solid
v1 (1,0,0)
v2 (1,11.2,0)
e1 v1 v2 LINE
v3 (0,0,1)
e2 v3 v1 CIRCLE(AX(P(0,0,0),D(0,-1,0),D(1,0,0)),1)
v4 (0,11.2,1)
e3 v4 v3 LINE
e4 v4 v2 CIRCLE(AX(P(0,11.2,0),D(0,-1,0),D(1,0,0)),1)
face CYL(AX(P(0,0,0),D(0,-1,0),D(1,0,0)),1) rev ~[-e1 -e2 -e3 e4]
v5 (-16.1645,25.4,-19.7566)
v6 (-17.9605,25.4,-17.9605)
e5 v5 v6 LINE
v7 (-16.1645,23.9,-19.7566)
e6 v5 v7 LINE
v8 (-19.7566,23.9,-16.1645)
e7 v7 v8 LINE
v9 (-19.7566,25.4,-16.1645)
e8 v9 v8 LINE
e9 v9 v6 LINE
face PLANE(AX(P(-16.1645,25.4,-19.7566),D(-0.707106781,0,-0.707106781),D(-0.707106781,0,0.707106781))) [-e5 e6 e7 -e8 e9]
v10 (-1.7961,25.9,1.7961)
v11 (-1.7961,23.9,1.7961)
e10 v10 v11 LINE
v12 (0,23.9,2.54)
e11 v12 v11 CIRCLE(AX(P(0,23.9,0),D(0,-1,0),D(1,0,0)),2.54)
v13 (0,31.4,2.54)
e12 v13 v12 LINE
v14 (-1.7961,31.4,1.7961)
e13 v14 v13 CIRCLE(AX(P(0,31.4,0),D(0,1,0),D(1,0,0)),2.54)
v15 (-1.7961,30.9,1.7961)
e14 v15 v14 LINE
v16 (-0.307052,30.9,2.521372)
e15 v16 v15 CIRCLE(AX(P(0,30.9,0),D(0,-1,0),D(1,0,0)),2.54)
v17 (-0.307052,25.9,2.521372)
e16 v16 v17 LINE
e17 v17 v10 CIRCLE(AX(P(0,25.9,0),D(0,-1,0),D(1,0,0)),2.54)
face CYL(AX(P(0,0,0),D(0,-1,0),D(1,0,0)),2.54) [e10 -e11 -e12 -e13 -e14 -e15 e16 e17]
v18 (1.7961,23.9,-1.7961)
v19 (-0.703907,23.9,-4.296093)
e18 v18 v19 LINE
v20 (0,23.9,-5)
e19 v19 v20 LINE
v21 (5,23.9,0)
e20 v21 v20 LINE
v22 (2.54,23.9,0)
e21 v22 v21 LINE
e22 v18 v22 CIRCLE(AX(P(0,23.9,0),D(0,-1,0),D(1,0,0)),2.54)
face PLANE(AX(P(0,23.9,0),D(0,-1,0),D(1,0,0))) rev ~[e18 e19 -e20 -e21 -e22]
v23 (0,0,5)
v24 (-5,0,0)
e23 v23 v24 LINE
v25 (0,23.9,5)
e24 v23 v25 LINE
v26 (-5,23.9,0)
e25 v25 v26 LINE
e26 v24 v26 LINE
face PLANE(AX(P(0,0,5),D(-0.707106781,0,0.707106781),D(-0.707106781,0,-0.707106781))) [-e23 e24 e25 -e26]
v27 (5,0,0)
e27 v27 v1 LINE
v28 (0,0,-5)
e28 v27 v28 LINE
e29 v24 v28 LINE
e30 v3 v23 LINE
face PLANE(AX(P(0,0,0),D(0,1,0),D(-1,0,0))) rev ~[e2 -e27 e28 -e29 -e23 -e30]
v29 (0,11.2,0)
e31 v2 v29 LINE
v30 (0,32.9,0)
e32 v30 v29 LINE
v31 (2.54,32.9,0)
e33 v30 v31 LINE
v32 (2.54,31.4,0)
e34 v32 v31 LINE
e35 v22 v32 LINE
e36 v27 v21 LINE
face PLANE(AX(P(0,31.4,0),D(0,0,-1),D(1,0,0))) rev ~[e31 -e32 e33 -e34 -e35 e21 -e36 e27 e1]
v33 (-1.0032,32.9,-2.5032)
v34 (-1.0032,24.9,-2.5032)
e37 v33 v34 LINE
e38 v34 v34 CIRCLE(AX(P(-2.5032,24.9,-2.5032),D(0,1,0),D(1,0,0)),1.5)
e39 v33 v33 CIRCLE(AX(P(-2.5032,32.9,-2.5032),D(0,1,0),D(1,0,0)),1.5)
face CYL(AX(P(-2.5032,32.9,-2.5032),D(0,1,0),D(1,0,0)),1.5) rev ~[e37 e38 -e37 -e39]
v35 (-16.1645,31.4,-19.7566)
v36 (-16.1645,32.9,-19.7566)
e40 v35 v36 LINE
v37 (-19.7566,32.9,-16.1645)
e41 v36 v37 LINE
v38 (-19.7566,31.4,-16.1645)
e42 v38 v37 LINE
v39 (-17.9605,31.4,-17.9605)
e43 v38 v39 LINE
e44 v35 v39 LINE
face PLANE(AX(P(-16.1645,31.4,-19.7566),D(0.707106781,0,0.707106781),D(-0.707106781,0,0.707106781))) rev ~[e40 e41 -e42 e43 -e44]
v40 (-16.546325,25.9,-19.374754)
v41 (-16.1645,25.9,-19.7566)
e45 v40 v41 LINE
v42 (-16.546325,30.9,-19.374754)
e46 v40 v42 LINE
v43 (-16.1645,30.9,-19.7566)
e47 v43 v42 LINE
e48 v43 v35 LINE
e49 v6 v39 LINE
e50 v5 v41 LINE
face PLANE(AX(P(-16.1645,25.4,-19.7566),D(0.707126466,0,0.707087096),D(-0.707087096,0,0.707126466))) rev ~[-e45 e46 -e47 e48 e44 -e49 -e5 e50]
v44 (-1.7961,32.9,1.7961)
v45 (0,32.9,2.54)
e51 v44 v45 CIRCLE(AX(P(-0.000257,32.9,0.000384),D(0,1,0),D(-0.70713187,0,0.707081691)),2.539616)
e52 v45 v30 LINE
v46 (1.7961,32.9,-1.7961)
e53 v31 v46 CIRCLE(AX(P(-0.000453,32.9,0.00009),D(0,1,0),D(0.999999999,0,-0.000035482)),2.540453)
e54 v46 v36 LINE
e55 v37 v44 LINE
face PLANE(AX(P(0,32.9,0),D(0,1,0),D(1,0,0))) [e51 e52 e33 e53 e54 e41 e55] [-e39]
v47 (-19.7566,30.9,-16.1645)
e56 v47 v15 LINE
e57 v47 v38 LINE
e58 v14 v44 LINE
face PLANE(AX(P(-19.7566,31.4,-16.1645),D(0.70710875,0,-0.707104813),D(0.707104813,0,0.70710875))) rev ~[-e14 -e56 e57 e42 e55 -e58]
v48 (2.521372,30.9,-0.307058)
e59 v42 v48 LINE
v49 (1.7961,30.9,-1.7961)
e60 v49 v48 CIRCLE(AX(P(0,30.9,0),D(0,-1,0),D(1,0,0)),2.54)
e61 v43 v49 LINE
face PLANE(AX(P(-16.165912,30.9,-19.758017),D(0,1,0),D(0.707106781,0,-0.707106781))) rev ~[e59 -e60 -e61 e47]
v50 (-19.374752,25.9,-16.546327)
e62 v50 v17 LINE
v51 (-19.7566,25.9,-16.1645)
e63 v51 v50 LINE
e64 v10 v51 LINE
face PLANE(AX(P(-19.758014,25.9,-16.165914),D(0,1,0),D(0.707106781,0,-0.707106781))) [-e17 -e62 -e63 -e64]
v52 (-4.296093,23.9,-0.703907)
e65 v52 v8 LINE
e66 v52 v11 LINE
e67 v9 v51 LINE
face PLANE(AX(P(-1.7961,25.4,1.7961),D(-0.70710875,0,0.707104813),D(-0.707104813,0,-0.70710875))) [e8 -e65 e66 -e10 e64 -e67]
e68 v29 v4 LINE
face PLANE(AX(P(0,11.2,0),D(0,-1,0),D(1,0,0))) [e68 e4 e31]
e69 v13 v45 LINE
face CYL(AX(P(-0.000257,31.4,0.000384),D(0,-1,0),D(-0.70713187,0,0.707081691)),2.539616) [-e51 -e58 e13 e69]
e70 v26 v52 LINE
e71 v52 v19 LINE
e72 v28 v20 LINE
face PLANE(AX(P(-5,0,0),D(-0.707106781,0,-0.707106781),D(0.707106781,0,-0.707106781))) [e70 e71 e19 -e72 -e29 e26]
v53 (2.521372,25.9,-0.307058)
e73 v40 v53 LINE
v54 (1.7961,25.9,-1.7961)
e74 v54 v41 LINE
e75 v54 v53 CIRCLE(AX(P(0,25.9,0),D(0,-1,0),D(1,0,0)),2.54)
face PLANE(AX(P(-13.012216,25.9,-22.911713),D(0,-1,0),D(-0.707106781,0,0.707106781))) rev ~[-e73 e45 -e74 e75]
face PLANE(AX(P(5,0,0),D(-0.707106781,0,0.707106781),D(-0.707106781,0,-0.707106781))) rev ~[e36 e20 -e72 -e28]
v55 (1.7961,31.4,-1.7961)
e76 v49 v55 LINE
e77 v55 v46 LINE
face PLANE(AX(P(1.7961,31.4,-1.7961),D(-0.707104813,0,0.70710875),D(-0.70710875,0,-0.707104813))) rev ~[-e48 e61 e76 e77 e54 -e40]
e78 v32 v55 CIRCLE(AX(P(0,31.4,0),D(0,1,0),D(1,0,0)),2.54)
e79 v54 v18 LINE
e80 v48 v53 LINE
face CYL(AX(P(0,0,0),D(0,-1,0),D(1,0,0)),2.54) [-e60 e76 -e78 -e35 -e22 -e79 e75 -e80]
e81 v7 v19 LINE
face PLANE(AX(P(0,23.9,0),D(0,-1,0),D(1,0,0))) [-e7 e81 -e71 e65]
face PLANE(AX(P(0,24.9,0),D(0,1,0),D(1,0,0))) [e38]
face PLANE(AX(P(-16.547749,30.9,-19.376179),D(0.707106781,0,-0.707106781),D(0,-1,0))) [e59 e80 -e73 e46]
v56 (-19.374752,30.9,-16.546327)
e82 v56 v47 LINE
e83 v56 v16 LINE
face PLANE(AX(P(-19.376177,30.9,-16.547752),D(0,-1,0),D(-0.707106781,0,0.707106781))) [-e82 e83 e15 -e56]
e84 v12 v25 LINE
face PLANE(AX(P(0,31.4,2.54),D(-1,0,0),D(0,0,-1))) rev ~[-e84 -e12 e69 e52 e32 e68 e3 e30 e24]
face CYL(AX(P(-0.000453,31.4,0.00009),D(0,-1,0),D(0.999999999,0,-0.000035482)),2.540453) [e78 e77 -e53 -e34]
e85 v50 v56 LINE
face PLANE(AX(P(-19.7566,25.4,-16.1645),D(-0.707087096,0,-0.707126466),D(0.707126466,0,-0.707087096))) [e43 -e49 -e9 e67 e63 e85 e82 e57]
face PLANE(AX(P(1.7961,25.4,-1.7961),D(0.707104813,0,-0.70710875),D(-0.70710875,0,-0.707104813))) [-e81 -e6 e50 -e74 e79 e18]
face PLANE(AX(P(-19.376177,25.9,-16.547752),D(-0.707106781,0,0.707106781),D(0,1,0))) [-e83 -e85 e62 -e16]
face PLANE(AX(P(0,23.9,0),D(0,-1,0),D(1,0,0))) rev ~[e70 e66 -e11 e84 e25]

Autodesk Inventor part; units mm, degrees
ref_plane "YZ Plane" through (0, 0, 0) normal (1, 0, 0) x (0, 1, 0)
ref_plane "XZ Plane" through (0, 0, 0) normal (0, 1, 0) x (-1, 0, 0)
ref_plane "XY Plane" through (0, 0, 0) normal (0, 0, 1) x (1, 0, 0)
sketch "Sketch1" plane through (0, 0, 0) normal (0, 1, 0) x (-1, 0, 0)
  arc A0 (-2.54, 0) -> (0, 2.54) centre (0, 0) ccw
  line L0 (0, 2.54) -> (0, 0)
  line L1 (0, 0) -> (-2.54, 0)
  dimension "d0" = 5.08
extrude "Extrusion1" add sketch "Sketch1" along normal blind 25.4
sketch "Sketch2" plane through (0, 25.4, 0) normal (0, 1, 0) x (1, 0, 0)
  line L0 (0, -2.54) -> (0, 0) projected
  line L1 (0, 0) -> (-17.9605, 17.9605)
  line L2 (0, 0) -> (25.4, 0) construction
  line L3 (0, 0) -> (-1.7961, -1.7961)
  arc A0 (2.54, 0) -> (0, -2.54) centre (0, 0) ccw projected
  line L4 (0, 0) -> (1.7961, 1.7961)
  line L5 (-1.7961, -1.7961) -> (-19.7566, 16.1645)
  line L6 (-19.7566, 16.1645) -> (-17.9605, 17.9605)
  line L7 (-16.1645, 19.7566) -> (1.7961, 1.7961)
  line L8 (-16.1645, 19.7566) -> (-17.9605, 17.9605)
  line L9 (0, 0) -> (2.54, 0)
  dimension "d3" = 25.4
  dimension "d4" = 135
extrude "Extrusion2" add sketch "Sketch2" along normal blind 6
sketch "Sketch3" plane through (-19.7566, 25.4, -16.1645) normal (-0.7071068, 0, -0.7071068) x (-0.7071068, 0, 0.7071068)
  line L0 (-5.08, 0) -> (-5.08, 6) projected
  line L1 (0, 6) -> (-5.08, 6)
  line L2 (-5.08, 6) -> (-5.08, 0)
  line L3 (-5.08, 0) -> (0, 0)
  line L4 (0, 0.5) -> (0, 5.5)
  line L5 (-2.54, 6) -> (-4.3361, 6) projected
  line L6 (-2.54, 6) -> (-2.54, 0)
  line L7 (-4.54, 0) -> (-0.54, 0)
  line L8 (-0.54, 0.5) -> (-0.54, 5.5)
  line L9 (-0.54, 6) -> (-4.54, 6)
  line L10 (-4.54, 6) -> (-4.54, 0)
  line L11 (-4.54, 0) -> (-0.54, 6) construction
  line L12 (-0.54, 0) -> (-4.54, 6) construction
  line L13 (0, 0.5) -> (-5.08, 0.5)
  line L14 (-5.08, 0.5) -> (-5.08, 5.5)
  line L15 (-5.08, 5.5) -> (0, 5.5)
  line L16 (0, 0.5) -> (-5.08, 5.5) construction
  line L17 (-5.08, 0.5) -> (0, 5.5) construction
  line L18 (-5.08, 0) -> (0, 0)
  line L19 (0, 0) -> (0, 6)
  line L20 (0, 6) -> (-5.08, 6)
  line L21 (-5.08, 6) -> (-5.08, 0)
  line L22 (-5.08, 0) -> (0, 6) construction
  line L23 (0, 0) -> (-5.08, 6) construction
  line L24 (-0.7439, 6) -> (0, 6)
  line L25 (-5.08, 0) -> (0, 0)
  line L26 (0, 0) -> (0, 6)
  line L27 (0, 6) -> (-5.08, 6)
  line L28 (-5.08, 6) -> (-5.08, 0)
  line L29 (-5.08, 0) -> (0, 6) construction
  line L30 (0, 0) -> (-5.08, 6) construction
  line L31 (0, 6) -> (0, 0)
  line L32 (-4.54, 5.5) -> (-9.54, 5.5)
  line L33 (-9.54, 5.5) -> (-9.54, 0.5)
  line L34 (-9.54, 0.5) -> (-4.54, 0.5)
  line L35 (-4.54, 0.5) -> (-4.54, 5.5)
  line L36 (-0.54, 5.5) -> (4.46, 5.5)
  line L37 (4.46, 5.5) -> (4.46, 0.5)
  line L38 (4.46, 0.5) -> (-0.54, 0.5)
  line L39 (-0.54, 0.5) -> (-0.54, 5.5)
  point P0 (-2.54, -25.4)
  point P1 (-2.54, 3)
  point P2 (-4.54, 5.5)
  point P3 (-5.08, 5.5)
  point P4 (-5.08, 0.5)
  point P5 (-4.54, 0.5)
  point P6 (0, 5.5)
  point P7 (0, 0.5)
  point P8 (-5.08, 0.5)
  point P9 (-5.08, 5.5)
  dimension "d7" = 4
  dimension "d8" = 5
  dimension "d11" = 6
  dimension "d40" = 5
  dimension "d41" = 5
extrude "Extrusion5" cut sketch "Sketch3" against normal blind 33.8125 contours L34 L33 L32 L0 | L0 L15 L10 L13 | L8 L15 L4 L13 | L4 L36 L37 L38
sketch "Sketch6" plane through (0, 31.4, 0) normal (0, 1, 0) x (1, 0, 0)
  arc A0 (1.7961, 1.7961) -> (-1.7961, -1.7961) centre (0, 0) ccw projected
  circle A1 centre (0, 0) radius 2.54
  line L0 (1.7961, 1.7961) -> (-16.1645, 19.7566) projected
  line L1 (0, 3.5921) -> (-3.5921, 0)
  line L2 (-19.7566, 16.1645) -> (-1.7961, -1.7961) projected
  line L3 (-1.7961, 1.7961) -> (-2.5032, 2.5032)
  circle A2 centre (-2.5032, 2.5032) radius 2.54
  dimension "d16" = 1
ref_plane "Work Plane3" through (-2.5032, 37.9, -2.5032) normal (0, 1, 0) x (1, 0, 0)
sketch "Sketch7" plane through (-2.5032, 37.9, -2.5032) normal (0, 1, 0) x (1, 0, 0)
  circle A0 centre (0, 0) radius 1.5
  point P0 (2.5032, -2.5032)
  dimension "d19" = 3
extrude "Extrusion7" cut sketch "Sketch7" against normal blind 6
sketch "Sketch10" plane through (0, 31.4, 0) normal (0, 1, 0) x (1, 0, 0)
  arc A0 (-1.7961, -1.7961) -> (0, -2.54) centre (0, 0) ccw projected
  line L0 (0, -2.54) -> (0, 0) projected
  line L1 (0, 0) -> (2.54, 0) projected
  line L2 (1.7961, 1.7961) -> (-16.1645, 19.7566) projected
  line L3 (-19.7566, 16.1645) -> (-1.7961, -1.7961) projected
  line L4 (-19.7566, 16.1645) -> (-1.7961, -1.7961) projected
  line L5 (-16.1645, 19.7566) -> (-19.7566, 16.1645) projected
  line L6 (1.7961, 1.7961) -> (-16.1645, 19.7566) projected
  arc A1 (2.54, 0) -> (1.7961, 1.7961) centre (0, 0) ccw projected
  point P0 (-0.7071, 4.2992)
  point P1 (2.5214, 0.3071)
  point P2 (-4.2992, 0.7071)
extrude "Extrusion9" add sketch "Sketch10" along normal blind 1.5
sketch "Sketch11" plane through (0, 25.4, 0) normal (0, -1, 0) x (1, 0, 0)
  arc A0 (-1.7961, 1.7961) -> (1.7961, -1.7961) centre (0, 0) ccw projected
  line L0 (-19.7566, -16.1645) -> (-1.7961, 1.7961) projected
  line L1 (-16.1645, -19.7566) -> (-19.7566, -16.1645) projected
  line L2 (1.7961, -1.7961) -> (-16.1645, -19.7566) projected
extrude "Extrusion10" add sketch "Sketch11" along normal blind 1.5
sketch "Sketch13" plane through (0, 0, 0) normal (0, -1, 0) x (1, 0, 0)
  line L0 (0, 0) -> (2.54, 0) projected
  arc A0 (0, 5) -> (5, 0) centre (0, 0) ccw
  line L1 (0, 0) -> (0, 5)
  line L2 (0, 0) -> (5, 0)
  dimension "d37" = 10
extrude "Extrusion12" add sketch "Sketch13" against normal up to surface (23.9 mm away)
sketch "Sketch14" plane through (0, 0, 0) normal (0, -1, 0) x (1, 0, 0)
  circle A0 centre (0, 0) radius 1
  dimension "d42" = 2
extrude "Extrusion13" cut sketch "Sketch14" against normal blind 11.2
sketch "Sketch15" plane through (0, 32.9, 0) normal (0, 1, 0) x (1, 0, 0)
  circle A0 centre (-2.5032, 2.5032) radius 1.5 projected
  circle A1 centre (-2.5032, 2.5032) radius 1.5
  point P0 (0, 0)
extrude "Extrusion14" cut sketch "Sketch15" against normal blind 8
thread "Thread2" size "M3x0.5" class "6H" standard "ANSI Metric M Profile" full length
sketch "Sketch16" plane through (0, 0, 0) normal (0, -1, 0) x (1, 0, 0)
  arc A0 (0, 5) -> (5, 0) centre (0, 0) ccw projected
  line L0 (0, 0) -> (3.981, 3.981)
  line L1 (0, 0) -> (5.63, 0) construction
  line L2 (0, 5) -> (-5, 0)
  line L3 (5, 0) -> (0, -5)
  line L4 (-5, 0) -> (0, -5)
  circle A1 centre (0, 0) radius 5
  dimension "d52" = 45
extrude "Extrusion15" cut sketch "Sketch16" against normal up to surface (23.9 mm away) contours L2 A0 | L4 A0 | L3 A0
sketch "Sketch17" plane through (-19.3747, 25.9, -16.5463) normal (-0.7071068, 0, -0.7071068) x (-0.7071068, 0, 0.7071068)
  line L0 (0, 0) -> (0.54, 0) projected
  line L1 (0.54, 5) -> (0, 5) projected
  line L2 (-4, 0) -> (-4, 5) projected
  line L3 (-4.54, 0) -> (-4, 0) projected
  line L4 (-4, 5) -> (-4.54, 5) projected
  line L5 (0.54, -2) -> (0.54, 0) projected
  line L6 (0.54, -2) -> (-0.2039, -2) projected
  line L7 (-2, 7) -> (-3.7961, 7) projected
  line L8 (-4.54, 5) -> (-4.54, 7) projected
  line L9 (-3.7961, 7) -> (-4.54, 7) projected
  line L10 (0.54, -2) -> (-0.2039, -2) projected
  line L11 (-0.2039, -2) -> (-0.2039, 7) projected
  line L12 (0.54, 7) -> (-0.2039, 7) projected
  line L13 (0.54, 5) -> (0.54, 7) projected
  line L14 (0.54, 5) -> (0, 5) projected
  line L15 (0, 5) -> (0, 0) projected
  line L16 (0, 0) -> (0.54, 0) projected
  line L17 (0.54, -2) -> (0.54, 0) projected
  line L18 (-3.7961, -2) -> (-3.7961, 7) projected
  line L19 (-3.7961, -2) -> (-4.54, -2) projected
  line L20 (-4.54, -2) -> (-4.54, 0) projected
  line L21 (-4.54, 0) -> (-4, 0) projected
  line L22 (-4, 0) -> (-4, 5) projected
  line L23 (-4, 5) -> (-4.54, 5) projected
  line L24 (-4.54, 5) -> (-4.54, 7) projected
  line L25 (-3.7961, 7) -> (-4.54, 7) projected
  line L26 (-3.7961, -2) -> (-3.7961, 7) projected
  line L27 (0.54, -2) -> (-4.54, -2) projected
  line L28 (0, 5) -> (0, 0) projected
  line L29 (-3.7961, -2) -> (-4.54, -2) projected
  line L30 (0.54, -2) -> (-4.54, -2) projected
  line L31 (0.54, 0) -> (0, 0) projected
  line L32 (0, 0) -> (0, 5) projected
  line L33 (0, 5) -> (0.54, 5) projected
  line L34 (0.54, 5) -> (0.54, 7) projected
  line L35 (-4.54, 7) -> (0.54, 7) projected
  line L36 (-4.54, 5) -> (-4.54, 7) projected
  line L37 (-4.54, 5) -> (-4, 5) projected
  line L38 (-4, 5) -> (-4, 0) projected
  line L39 (-4, 0) -> (-4.54, 0) projected
  line L40 (-4.54, -2) -> (-4.54, 0) projected
  line L41 (0.54, -2) -> (-4.54, -2) projected
  line L42 (0.54, 0) -> (0.54, -2) projected
  line L43 (-3.5, 7) -> (-0.5, 7) projected
  line L44 (-0.2039, 7) -> (-2, 7) projected
  line L45 (-2, 7) -> (-3.7961, 7) projected
  line L46 (-3.7961, 7) -> (-4.54, 7) projected
  line L47 (-4.54, 7) -> (0.54, 7) projected
  line L48 (0.54, 7) -> (-0.2039, 7) projected
  line L49 (0.54, -2) -> (-4.54, -2) projected
  line L50 (0.54, -2) -> (-4.54, -2) projected
  line L51 (0.54, 5) -> (0.54, 7) projected
  line L52 (0, 5) -> (0.54, 5) projected
  line L53 (0.54, 5) -> (0.54, 7) projected
  line L54 (0.54, 0) -> (0, 0) projected
  line L55 (0.54, 5) -> (0.54, 7) projected
  line L56 (0.54, 5) -> (0.54, 7) projected
  line L57 (0.54, 0) -> (0.54, -2) projected
  line L58 (0.54, -2) -> (0.54, 0) projected
  line L59 (0.54, 5) -> (0, 5) projected
  line L60 (0, 5) -> (0.54, 5) projected
  line L61 (0, 0) -> (0.54, 0) projected
  line L62 (0.54, 0) -> (0, 0) projected
  line L63 (0, 5) -> (0, 0) projected
  line L64 (0, 0) -> (0, 5) projected
  line L65 (-4.54, -2) -> (-4.54, 0) projected
  line L66 (0.54, 7) -> (-0.2039, 7) projected
  line L67 (-4.54, 5) -> (-4.54, 7) projected
  line L68 (-4.54, -2) -> (-4.54, 0) projected
  line L69 (-4, 0) -> (-4.54, 0) projected
  line L70 (-4.54, 5) -> (-4, 5) projected
  line L71 (-4, 0) -> (-4, 5) projected
  line L72 (-4, 5) -> (-4, 0) projected
  line L73 (-4, 0) -> (-4.54, 0) projected
  line L74 (-4.54, 0) -> (-4, 0) projected
  line L75 (-4, 5) -> (-4.54, 5) projected
  line L76 (-4.54, 5) -> (-4, 5) projected
  line L77 (-4.54, -2) -> (-4.54, 0) projected
  line L78 (-4.54, -2) -> (-4.54, 0) projected
  line L79 (-4.54, 5) -> (-4.54, 7) projected
  line L80 (-4.54, 5) -> (-4.54, 7) projected
  line L81 (-4.54, 7) -> (0.54, 7) projected
  line L82 (-4, 5) -> (-4, 0) projected
  line L83 (0.54, 0) -> (0.54, -2) projected
  line L84 (-0.2039, -2) -> (-0.2039, 7) projected
  line L85 (-3.5, -1) -> (-0.5, -1) projected
  line L86 (-3.5, -1) -> (-0.5, -1) projected
  line L87 (-3.5, 7) -> (-0.5, 7) projected
  line L88 (-3.5, -1) -> (-0.5, -1) projected
  line L89 (-3.5, 7) -> (-0.5, 7) projected
  line L90 (0, 0) -> (0, 5) projected
  line L91 (-0.2039, 7) -> (-2, 7) projected
  line L92 (0.54, 5.5) -> (-4.54, 5.5) projected
  line L93 (0.54, 5.5) -> (-4.54, 5.5) projected
  line L94 (-4.54, 5.5) -> (0.54, 5.5) projected
  line L95 (0.54, 5.5) -> (-4.54, 5.5) projected
  point P0 (-2, -25.9)
  point P1 (-2, 5.5)
  point P2 (-2, 5.5)
  point P3 (-2, 5.5)
  point P4 (-4.54, 5.5)
  point P5 (0.54, 5.5)
  point P6 (0.54, 5.5)
  point P7 (-2, 5.5)
  point P8 (-2, 5.5)
  point P9 (-2, 5.5)
  point P10 (-2, 5.5)
sketch "Sketch18" plane through (0, 32.9, 0) normal (0, 1, 0) x (1, 0, 0)
  point P0 (0, 0)
sketch "Sketch19" plane through (0, 0, 0) normal (0, -1, 0) x (1, 0, 0)
  arc A0 (-0.3071, 2.5214) -> (-1.7961, 1.7961) centre (0, 0) ccw projected
  arc A1 (-0.3071, 2.5214) -> (-1.7961, 1.7961) centre (0, 0) ccw projected
  arc A2 (1.7961, -1.7961) -> (2.5214, -0.3071) centre (0, 0) ccw projected
  arc A3 (1.7961, -1.7961) -> (2.5214, -0.3071) centre (0, 0) ccw projected
  arc A4 (0, 2.54) -> (-1.7961, 1.7961) centre (0, 0) ccw projected
  line L0 (0, 5) -> (0, 2.54) projected
  line L1 (0, 0) -> (2.54, 0) projected
  line L2 (-1.7961, 1.7961) -> (-4.2961, -0.7039) projected
  arc A5 (1.7961, -1.7961) -> (2.54, 0) centre (0, 0) ccw projected
  line L3 (-4.2961, -0.7039) -> (-5, 0) projected
  arc A6 (0, 2.54) -> (-1.7961, 1.7961) centre (0, 0) ccw projected
  arc A7 (0, 2.54) -> (-1.7961, 1.7961) centre (0, 0) ccw projected
  arc A8 (-0.3071, 2.5214) -> (-1.7961, 1.7961) centre (0, 0) ccw projected
  arc A9 (-0.3071, 2.5214) -> (-1.7961, 1.7961) centre (0, 0) ccw projected
  line L4 (-5, 0) -> (0, 5) projected
  line L5 (-5, 0) -> (0, 5) projected
  line L6 (0, 5) -> (0, 2.54) projected
  arc A10 (0, 2.54) -> (-1.7961, 1.7961) centre (0, 0) ccw projected
  line L7 (-1.7961, 1.7961) -> (-4.2961, -0.7039) projected
  line L8 (-4.2961, -0.7039) -> (-5, 0) projected
  arc A11 (1.7961, -1.7961) -> (2.54, 0) centre (0, 0) ccw projected
  arc A12 (1.7961, -1.7961) -> (2.5214, -0.3071) centre (0, 0) ccw projected
  arc A13 (1.7961, -1.7961) -> (2.5214, -0.3071) centre (0, 0) ccw projected
  arc A14 (1.7961, -1.7961) -> (2.54, 0) centre (0, 0) ccw projected
  line L9 (-4.2961, -0.7039) -> (-0.7039, -4.2961) projected
  line L10 (0, 1) -> (0, 0) projected
  line L11 (0, 1) -> (0, 0) projected
  line L12 (0, 2.54) -> (0, 0) projected
  line L13 (0, 5) -> (0, 2.54) projected
  line L14 (0, 5) -> (0, 1) projected
  line L15 (0, 0) -> (1, 0) projected
  line L16 (1, 0) -> (5, 0) projected
  line L17 (2.54, 0) -> (5, 0) projected
  line L18 (0, 0) -> (2.54, 0) projected
  line L19 (5, 0) -> (0, -5) projected
  line L20 (0, -5) -> (5, 0) projected
  line L21 (-4.2961, -0.7039) -> (-5, 0) projected
  line L22 (-4.2961, -0.7039) -> (-0.7039, -4.2961) projected
  line L23 (0, -5) -> (-0.7039, -4.2961) projected
  line L24 (-5, 0) -> (0, -5) projected
  line L25 (-5, 0) -> (0, -5) projected
  line L26 (0, 5) -> (-5, 0) projected
  line L27 (-5, 0) -> (0, 5) projected
  line L28 (0, 5) -> (-5, 0) projected
  line L29 (0, -5) -> (-0.7039, -4.2961) projected
  arc A15 (1.7961, -1.7961) -> (2.54, 0) centre (0, 0) ccw projected
  line L30 (-0.7039, -4.2961) -> (1.7961, -1.7961) projected
  line L31 (2.54, 0) -> (5, 0) projected
  line L32 (5, 0) -> (0, -5) projected
  line L33 (0, -5) -> (-0.7039, -4.2961) projected
  line L34 (-0.7039, -4.2961) -> (1.7961, -1.7961) projected
  arc A16 (1.7961, -1.7961) -> (2.54, 0) centre (0, 0) ccw projected
  line L35 (2.54, 0) -> (5, 0) projected
  line L36 (5, 0) -> (0, -5) projected
  arc A17 (0, 2.54) -> (-1.7961, 1.7961) centre (0, 0) ccw projected
  circle A18 centre (-2.5032, -2.5032) radius 1.5 projected
  circle A19 centre (-2.5032, -2.5032) radius 1.5 projected
  circle A20 centre (-2.5032, -2.5032) radius 1.5 projected
  circle A21 centre (-2.5032, -2.5032) radius 1.5 projected
  circle A22 centre (-2.5032, -2.5032) radius 1.5 projected
  line L37 (0, 5) -> (0, 1) projected
  arc A23 (0, 1) -> (1, 0) centre (0, 0) ccw projected
  line L38 (0, -5) -> (5, 0) projected
  line L39 (1, 0) -> (5, 0) projected
  line L40 (0, 0) -> (1, 0) projected
  arc A24 (0, 1) -> (1, 0) centre (0, 0) ccw projected
  line L41 (0, 0) -> (1, 0) projected
  line L42 (0, 1) -> (0, 0) projected
  arc A25 (0, 1) -> (1, 0) centre (0, 0) ccw projected
  arc A26 (0, 1) -> (1, 0) centre (0, 0) ccw projected
  arc A27 (0, 1) -> (1, 0) centre (0, 0) ccw projected
  line L43 (0, 5) -> (-5, 0) projected
  line L44 (-5, 0) -> (0, -5) projected
  line L45 (0, -5) -> (5, 0) projected
  line L46 (1, 0) -> (5, 0) projected
  arc A28 (0, 1) -> (1, 0) centre (0, 0) ccw projected
  line L47 (0, 5) -> (0, 1) projected
  line L48 (0, 2.54) -> (0, 0) projected
  arc A29 (-1.7961, 1.7961) -> (1.7961, -1.7961) centre (0, 0) ccw projected
  circle A30 centre (0, 0) radius 2.54 projected
  line L49 (0, -3.5921) -> (-3.5921, 0) projected
  line L50 (-1.7961, -1.7961) -> (-2.5032, -2.5032) projected
  circle A31 centre (-2.5032, -2.5032) radius 2.54 projected
  line L51 (-19.7566, -16.1645) -> (-16.1645, -19.7566) projected
  dimension "d55" = 21.8645
properties part number "Redesign_Gripper_Finger_3DPrint"
